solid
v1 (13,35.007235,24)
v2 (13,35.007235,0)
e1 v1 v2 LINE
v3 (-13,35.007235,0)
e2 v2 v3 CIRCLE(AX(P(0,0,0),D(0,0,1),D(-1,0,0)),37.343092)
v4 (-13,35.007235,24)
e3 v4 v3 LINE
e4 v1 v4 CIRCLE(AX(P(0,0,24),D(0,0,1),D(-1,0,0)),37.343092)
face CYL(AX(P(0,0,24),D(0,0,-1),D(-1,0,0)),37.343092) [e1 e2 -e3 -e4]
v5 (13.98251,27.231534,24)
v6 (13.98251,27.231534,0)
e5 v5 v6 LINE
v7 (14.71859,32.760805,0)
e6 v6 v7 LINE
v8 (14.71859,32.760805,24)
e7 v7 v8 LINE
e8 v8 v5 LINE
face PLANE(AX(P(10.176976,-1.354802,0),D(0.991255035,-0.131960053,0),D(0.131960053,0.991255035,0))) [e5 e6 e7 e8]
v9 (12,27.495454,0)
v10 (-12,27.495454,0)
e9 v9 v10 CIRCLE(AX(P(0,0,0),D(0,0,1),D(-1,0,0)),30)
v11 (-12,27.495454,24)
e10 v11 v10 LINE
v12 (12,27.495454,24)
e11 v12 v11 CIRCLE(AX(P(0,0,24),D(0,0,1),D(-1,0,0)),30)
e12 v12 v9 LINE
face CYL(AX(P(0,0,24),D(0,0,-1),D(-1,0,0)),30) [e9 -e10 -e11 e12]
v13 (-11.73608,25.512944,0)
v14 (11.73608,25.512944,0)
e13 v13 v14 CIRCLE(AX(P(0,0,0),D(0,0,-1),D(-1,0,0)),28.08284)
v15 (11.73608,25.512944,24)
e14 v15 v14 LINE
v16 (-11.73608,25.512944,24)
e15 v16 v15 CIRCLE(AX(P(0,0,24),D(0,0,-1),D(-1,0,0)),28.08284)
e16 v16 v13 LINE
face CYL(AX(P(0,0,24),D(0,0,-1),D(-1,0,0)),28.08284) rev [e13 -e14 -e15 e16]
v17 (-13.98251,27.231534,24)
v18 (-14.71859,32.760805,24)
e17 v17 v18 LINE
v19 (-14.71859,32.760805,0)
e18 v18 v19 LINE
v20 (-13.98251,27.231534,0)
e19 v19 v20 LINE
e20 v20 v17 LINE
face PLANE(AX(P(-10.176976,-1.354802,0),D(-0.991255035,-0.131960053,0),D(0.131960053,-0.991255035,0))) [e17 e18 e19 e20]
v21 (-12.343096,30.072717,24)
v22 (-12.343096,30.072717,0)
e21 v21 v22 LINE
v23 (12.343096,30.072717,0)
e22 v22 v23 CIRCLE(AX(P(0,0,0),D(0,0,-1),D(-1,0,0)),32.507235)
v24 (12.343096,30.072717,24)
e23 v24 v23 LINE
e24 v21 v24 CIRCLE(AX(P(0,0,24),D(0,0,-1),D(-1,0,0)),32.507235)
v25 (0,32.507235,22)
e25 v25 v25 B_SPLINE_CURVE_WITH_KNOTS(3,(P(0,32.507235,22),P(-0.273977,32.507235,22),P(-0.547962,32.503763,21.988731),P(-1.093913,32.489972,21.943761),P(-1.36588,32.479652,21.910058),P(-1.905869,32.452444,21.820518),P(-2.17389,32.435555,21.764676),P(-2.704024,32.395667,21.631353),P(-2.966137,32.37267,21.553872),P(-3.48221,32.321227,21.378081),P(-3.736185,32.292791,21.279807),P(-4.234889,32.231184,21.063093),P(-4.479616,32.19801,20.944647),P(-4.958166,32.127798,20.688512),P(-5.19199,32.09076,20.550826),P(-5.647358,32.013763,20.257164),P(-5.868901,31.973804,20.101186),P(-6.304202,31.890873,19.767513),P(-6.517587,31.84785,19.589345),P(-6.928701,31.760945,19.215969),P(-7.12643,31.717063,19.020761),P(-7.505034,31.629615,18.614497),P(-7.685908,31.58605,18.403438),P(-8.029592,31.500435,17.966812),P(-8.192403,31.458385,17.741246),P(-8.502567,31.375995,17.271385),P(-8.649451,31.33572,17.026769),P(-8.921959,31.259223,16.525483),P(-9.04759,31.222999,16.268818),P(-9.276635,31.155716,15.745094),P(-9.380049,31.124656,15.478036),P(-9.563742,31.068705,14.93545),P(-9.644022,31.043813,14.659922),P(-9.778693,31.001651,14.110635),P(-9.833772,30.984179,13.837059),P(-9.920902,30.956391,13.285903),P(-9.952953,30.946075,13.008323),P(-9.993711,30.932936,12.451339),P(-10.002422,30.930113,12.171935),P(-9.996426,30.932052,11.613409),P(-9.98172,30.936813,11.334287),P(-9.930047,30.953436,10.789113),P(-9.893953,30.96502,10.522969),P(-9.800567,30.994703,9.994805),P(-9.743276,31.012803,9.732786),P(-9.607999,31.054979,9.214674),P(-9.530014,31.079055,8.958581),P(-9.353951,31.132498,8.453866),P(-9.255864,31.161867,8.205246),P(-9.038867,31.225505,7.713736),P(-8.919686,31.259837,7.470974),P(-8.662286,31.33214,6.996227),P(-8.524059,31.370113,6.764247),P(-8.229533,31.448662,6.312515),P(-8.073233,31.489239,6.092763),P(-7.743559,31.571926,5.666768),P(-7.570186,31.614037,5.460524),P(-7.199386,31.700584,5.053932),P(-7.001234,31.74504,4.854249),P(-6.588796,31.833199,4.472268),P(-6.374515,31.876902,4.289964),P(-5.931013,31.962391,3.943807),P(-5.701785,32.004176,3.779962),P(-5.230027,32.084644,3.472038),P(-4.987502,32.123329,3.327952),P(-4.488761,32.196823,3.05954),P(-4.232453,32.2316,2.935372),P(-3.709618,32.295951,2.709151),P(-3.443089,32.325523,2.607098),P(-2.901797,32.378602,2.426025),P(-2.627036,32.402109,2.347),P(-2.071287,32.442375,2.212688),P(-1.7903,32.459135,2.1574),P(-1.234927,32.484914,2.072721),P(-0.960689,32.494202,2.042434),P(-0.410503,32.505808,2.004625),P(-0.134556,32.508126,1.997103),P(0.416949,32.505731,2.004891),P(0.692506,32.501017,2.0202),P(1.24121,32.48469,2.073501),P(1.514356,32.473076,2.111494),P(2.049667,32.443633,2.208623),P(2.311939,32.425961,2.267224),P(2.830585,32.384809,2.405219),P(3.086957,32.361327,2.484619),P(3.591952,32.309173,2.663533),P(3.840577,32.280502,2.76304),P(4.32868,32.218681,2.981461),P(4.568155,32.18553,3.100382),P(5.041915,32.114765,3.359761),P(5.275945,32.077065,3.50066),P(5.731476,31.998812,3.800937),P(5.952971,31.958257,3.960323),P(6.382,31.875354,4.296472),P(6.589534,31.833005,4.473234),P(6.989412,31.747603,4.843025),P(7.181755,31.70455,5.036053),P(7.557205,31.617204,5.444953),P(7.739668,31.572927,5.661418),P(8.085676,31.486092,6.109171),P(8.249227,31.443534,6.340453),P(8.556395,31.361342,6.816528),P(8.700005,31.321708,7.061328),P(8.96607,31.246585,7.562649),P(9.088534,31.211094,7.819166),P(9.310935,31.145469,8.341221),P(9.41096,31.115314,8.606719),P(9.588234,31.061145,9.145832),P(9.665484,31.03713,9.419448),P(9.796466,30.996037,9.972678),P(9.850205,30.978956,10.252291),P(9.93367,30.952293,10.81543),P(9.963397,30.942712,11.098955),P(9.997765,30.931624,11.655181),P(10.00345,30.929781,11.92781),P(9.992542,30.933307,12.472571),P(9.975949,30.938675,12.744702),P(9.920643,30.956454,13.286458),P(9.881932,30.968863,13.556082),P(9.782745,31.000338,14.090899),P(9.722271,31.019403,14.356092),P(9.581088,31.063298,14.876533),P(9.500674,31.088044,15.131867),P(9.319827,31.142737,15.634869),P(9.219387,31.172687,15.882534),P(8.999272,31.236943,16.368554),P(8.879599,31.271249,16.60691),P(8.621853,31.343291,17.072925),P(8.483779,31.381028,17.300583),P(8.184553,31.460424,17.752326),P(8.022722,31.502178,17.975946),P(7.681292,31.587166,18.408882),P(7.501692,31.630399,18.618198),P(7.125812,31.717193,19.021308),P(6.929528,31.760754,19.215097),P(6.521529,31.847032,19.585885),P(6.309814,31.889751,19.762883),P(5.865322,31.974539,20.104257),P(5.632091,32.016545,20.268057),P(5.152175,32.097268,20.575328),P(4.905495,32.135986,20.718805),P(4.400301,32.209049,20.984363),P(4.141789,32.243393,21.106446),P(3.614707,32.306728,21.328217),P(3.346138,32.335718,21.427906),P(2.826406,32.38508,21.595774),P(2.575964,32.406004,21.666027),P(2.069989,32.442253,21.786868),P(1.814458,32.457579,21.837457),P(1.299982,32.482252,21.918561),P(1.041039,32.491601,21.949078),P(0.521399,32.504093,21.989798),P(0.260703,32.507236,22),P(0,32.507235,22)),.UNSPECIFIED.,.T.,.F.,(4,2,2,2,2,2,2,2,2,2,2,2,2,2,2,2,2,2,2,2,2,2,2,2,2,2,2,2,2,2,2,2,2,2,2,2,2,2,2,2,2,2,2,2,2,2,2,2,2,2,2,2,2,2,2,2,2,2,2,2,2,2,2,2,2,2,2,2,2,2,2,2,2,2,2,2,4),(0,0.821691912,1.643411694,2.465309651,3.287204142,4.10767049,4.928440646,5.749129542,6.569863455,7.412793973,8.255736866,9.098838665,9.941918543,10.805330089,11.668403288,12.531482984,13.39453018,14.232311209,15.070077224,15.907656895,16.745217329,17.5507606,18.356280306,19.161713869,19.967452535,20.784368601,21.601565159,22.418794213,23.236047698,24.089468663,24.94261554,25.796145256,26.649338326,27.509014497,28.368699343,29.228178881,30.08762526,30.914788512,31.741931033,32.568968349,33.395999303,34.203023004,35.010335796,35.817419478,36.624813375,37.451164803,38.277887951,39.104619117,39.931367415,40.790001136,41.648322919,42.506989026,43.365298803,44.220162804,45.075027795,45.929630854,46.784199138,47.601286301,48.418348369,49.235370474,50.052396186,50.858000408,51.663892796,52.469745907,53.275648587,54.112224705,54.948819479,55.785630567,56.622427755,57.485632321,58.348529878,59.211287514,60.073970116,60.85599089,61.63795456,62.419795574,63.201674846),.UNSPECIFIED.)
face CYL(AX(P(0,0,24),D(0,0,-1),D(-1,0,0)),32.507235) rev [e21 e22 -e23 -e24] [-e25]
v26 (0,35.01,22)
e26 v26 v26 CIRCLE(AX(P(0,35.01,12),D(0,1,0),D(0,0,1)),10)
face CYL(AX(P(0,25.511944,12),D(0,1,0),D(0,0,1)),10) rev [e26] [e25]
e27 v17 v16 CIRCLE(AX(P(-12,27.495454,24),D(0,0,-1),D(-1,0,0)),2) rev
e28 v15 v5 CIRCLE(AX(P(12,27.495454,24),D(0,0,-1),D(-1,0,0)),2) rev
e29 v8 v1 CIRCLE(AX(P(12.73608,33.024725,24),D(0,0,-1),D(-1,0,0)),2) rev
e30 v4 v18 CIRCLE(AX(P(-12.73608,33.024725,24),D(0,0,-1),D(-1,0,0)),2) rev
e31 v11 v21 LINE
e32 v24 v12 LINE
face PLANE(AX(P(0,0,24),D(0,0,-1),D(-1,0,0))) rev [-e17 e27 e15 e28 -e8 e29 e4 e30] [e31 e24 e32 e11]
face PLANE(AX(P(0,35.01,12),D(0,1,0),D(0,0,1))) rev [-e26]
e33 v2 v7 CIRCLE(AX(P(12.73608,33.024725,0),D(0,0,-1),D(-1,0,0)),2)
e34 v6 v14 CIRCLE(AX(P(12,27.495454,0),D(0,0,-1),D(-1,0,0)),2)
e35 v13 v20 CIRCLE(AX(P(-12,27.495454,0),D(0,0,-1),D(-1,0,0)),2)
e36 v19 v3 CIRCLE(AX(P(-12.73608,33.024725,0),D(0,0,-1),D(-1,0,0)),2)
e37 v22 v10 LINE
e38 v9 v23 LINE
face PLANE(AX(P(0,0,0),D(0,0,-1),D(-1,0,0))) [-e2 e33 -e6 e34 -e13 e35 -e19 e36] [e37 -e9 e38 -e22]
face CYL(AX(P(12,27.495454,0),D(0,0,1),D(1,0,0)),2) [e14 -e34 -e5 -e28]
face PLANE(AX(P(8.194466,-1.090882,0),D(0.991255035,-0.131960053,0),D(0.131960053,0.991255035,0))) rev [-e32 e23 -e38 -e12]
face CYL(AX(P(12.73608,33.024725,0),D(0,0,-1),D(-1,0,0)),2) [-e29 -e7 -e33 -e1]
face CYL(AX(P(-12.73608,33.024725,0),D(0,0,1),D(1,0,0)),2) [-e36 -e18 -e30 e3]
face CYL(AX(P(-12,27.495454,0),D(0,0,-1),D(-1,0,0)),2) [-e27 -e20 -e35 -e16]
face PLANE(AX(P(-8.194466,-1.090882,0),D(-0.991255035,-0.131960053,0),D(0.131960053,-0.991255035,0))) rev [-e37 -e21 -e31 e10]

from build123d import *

# Parameters (mm, degrees)
BOSS_EXTRUDE1_DEPTH                 = 24
BOSS_EXTRUDE1_2_DEPTH               = 24
SKETCH4_R                           = 10
CUT_EXTRUDE1_DEPTH                  = 2.5
CUT_EXTRUDE1_DIRECTION_2_REACH      = 30.177
CUT_EXTRUDE1_DIRECTION_2_END_RADIUS = 32.507235283
SKETCH5_W                           = 24
SKETCH5_H                           = 9.578050903
BOSS_EXTRUDE2_DEPTH                 = 2
SKETCH6_W                           = 24
SKETCH6_H                           = 9.578050903
BOSS_EXTRUDE3_DEPTH                 = 2
FILLET1_R                           = 2


with BuildPart() as part:
    # Sketch1 → Boss-Extrude1 (new body)
    with BuildSketch(Plane.XY):
        with BuildLine():
            Line((-13, 35.007235283), (-12.343096138, 30.072717261))
            ThreePointArc((-12.343096138, 30.072717261), (0, 32.507235283), (12.343096138, 30.072717261))
            Line((12.343096138, 30.072717261), (13, 35.007235283))
            ThreePointArc((13, 35.007235283), (0, 37.343092027), (-13, 35.007235283))
        make_face()
    extrude(amount=BOSS_EXTRUDE1_DEPTH)

    # Sketch4 → Cut-Extrude1 (cut)
    with BuildSketch(Plane(origin=(0, 32.51, 0), x_dir=(1, 0, 0), z_dir=(0, 1, 0))):
        with Locations(Location((0, -12, 0), (0, 0, 270))):
            Circle(SKETCH4_R)
    extrude(amount=CUT_EXTRUDE1_DEPTH, mode=Mode.SUBTRACT)

    # Cut-Extrude1 direction 2: up to this cylinder (the profile starts outside it)
    cut_extrude1_direction_2_end = Plane(origin=(0, 0, 12), z_dir=(0, 0, -1)) * Cylinder(CUT_EXTRUDE1_DIRECTION_2_END_RADIUS, 126.368470565, mode=Mode.PRIVATE)
    # Sketch4 → Cut-Extrude1 direction 2 (cut, up to the surface)
    with BuildSketch(Plane(origin=(0, 32.51, 0), x_dir=(1, 0, 0), z_dir=(0, 1, 0)), mode=Mode.PRIVATE) as cut_extrude1_direction_2_sk1:
        with Locations(Location((0, -12, 0), (0, 0, 270))):
            Circle(SKETCH4_R)
    cut_extrude1_direction_2_tool1 = extrude(cut_extrude1_direction_2_sk1.sketch, amount=-CUT_EXTRUDE1_DIRECTION_2_REACH, mode=Mode.PRIVATE) - cut_extrude1_direction_2_end
    add(cut_extrude1_direction_2_tool1.solids().sort_by_distance((0, 32.51, 12))[0], mode=Mode.SUBTRACT)



with BuildPart() as body_2:
    # Sketch1 → Boss-Extrude1 2 (new body)
    with BuildSketch(Plane.XY):
        with BuildLine():
            Line((11.736079894, 25.5129441), (12, 27.49545417))
            ThreePointArc((12, 27.49545417), (0, 30), (-12, 27.49545417))
            Line((-12, 27.49545417), (-11.736079894, 25.5129441))
            ThreePointArc((-11.736079894, 25.5129441), (0, 28.082839741), (11.736079894, 25.5129441))
        make_face()
    extrude(amount=BOSS_EXTRUDE1_2_DEPTH)


with BuildPart() as part_1:
    add(part.part)

    add(body_2.part)  # Boss-Extrude2 merges body 2
    # Sketch5 → Boss-Extrude2 (add)
    with BuildSketch(Plane(origin=(-8.194466309, -1.090881934, 0), x_dir=(0, 0, 1), z_dir=(-0.9912550349784054, -0.13196005315988815, 0))):
        with Locations((12, 31.627553475)):
            Rectangle(SKETCH5_W, SKETCH5_H)
    extrude(amount=BOSS_EXTRUDE2_DEPTH)

    # Sketch6 → Boss-Extrude3 (add)
    with BuildSketch(Plane(origin=(8.194466309, -1.090881934, 0), x_dir=(0, 0, -1), z_dir=(0.9912550349784054, -0.13196005315988815, 0))):
        with Locations((-12, 31.627553475)):
            Rectangle(SKETCH6_W, SKETCH6_H)
    extrude(amount=BOSS_EXTRUDE3_DEPTH)

    # Fillet1
    fillet1_edges = [part_1.edges().sort_by_distance(p)[0] for p in [
        (-14.98251007, 34.743315176, 12),
        (-13.718589964, 25.249023993, 12),
        (13.718589964, 25.249023993, 12),
        (14.98251007, 34.743315176, 12),
    ]]
    fillet(fillet1_edges, radius=FILLET1_R - 0.0001)  # a hair under: the kernel refuses the full size


solid = part_1.part
